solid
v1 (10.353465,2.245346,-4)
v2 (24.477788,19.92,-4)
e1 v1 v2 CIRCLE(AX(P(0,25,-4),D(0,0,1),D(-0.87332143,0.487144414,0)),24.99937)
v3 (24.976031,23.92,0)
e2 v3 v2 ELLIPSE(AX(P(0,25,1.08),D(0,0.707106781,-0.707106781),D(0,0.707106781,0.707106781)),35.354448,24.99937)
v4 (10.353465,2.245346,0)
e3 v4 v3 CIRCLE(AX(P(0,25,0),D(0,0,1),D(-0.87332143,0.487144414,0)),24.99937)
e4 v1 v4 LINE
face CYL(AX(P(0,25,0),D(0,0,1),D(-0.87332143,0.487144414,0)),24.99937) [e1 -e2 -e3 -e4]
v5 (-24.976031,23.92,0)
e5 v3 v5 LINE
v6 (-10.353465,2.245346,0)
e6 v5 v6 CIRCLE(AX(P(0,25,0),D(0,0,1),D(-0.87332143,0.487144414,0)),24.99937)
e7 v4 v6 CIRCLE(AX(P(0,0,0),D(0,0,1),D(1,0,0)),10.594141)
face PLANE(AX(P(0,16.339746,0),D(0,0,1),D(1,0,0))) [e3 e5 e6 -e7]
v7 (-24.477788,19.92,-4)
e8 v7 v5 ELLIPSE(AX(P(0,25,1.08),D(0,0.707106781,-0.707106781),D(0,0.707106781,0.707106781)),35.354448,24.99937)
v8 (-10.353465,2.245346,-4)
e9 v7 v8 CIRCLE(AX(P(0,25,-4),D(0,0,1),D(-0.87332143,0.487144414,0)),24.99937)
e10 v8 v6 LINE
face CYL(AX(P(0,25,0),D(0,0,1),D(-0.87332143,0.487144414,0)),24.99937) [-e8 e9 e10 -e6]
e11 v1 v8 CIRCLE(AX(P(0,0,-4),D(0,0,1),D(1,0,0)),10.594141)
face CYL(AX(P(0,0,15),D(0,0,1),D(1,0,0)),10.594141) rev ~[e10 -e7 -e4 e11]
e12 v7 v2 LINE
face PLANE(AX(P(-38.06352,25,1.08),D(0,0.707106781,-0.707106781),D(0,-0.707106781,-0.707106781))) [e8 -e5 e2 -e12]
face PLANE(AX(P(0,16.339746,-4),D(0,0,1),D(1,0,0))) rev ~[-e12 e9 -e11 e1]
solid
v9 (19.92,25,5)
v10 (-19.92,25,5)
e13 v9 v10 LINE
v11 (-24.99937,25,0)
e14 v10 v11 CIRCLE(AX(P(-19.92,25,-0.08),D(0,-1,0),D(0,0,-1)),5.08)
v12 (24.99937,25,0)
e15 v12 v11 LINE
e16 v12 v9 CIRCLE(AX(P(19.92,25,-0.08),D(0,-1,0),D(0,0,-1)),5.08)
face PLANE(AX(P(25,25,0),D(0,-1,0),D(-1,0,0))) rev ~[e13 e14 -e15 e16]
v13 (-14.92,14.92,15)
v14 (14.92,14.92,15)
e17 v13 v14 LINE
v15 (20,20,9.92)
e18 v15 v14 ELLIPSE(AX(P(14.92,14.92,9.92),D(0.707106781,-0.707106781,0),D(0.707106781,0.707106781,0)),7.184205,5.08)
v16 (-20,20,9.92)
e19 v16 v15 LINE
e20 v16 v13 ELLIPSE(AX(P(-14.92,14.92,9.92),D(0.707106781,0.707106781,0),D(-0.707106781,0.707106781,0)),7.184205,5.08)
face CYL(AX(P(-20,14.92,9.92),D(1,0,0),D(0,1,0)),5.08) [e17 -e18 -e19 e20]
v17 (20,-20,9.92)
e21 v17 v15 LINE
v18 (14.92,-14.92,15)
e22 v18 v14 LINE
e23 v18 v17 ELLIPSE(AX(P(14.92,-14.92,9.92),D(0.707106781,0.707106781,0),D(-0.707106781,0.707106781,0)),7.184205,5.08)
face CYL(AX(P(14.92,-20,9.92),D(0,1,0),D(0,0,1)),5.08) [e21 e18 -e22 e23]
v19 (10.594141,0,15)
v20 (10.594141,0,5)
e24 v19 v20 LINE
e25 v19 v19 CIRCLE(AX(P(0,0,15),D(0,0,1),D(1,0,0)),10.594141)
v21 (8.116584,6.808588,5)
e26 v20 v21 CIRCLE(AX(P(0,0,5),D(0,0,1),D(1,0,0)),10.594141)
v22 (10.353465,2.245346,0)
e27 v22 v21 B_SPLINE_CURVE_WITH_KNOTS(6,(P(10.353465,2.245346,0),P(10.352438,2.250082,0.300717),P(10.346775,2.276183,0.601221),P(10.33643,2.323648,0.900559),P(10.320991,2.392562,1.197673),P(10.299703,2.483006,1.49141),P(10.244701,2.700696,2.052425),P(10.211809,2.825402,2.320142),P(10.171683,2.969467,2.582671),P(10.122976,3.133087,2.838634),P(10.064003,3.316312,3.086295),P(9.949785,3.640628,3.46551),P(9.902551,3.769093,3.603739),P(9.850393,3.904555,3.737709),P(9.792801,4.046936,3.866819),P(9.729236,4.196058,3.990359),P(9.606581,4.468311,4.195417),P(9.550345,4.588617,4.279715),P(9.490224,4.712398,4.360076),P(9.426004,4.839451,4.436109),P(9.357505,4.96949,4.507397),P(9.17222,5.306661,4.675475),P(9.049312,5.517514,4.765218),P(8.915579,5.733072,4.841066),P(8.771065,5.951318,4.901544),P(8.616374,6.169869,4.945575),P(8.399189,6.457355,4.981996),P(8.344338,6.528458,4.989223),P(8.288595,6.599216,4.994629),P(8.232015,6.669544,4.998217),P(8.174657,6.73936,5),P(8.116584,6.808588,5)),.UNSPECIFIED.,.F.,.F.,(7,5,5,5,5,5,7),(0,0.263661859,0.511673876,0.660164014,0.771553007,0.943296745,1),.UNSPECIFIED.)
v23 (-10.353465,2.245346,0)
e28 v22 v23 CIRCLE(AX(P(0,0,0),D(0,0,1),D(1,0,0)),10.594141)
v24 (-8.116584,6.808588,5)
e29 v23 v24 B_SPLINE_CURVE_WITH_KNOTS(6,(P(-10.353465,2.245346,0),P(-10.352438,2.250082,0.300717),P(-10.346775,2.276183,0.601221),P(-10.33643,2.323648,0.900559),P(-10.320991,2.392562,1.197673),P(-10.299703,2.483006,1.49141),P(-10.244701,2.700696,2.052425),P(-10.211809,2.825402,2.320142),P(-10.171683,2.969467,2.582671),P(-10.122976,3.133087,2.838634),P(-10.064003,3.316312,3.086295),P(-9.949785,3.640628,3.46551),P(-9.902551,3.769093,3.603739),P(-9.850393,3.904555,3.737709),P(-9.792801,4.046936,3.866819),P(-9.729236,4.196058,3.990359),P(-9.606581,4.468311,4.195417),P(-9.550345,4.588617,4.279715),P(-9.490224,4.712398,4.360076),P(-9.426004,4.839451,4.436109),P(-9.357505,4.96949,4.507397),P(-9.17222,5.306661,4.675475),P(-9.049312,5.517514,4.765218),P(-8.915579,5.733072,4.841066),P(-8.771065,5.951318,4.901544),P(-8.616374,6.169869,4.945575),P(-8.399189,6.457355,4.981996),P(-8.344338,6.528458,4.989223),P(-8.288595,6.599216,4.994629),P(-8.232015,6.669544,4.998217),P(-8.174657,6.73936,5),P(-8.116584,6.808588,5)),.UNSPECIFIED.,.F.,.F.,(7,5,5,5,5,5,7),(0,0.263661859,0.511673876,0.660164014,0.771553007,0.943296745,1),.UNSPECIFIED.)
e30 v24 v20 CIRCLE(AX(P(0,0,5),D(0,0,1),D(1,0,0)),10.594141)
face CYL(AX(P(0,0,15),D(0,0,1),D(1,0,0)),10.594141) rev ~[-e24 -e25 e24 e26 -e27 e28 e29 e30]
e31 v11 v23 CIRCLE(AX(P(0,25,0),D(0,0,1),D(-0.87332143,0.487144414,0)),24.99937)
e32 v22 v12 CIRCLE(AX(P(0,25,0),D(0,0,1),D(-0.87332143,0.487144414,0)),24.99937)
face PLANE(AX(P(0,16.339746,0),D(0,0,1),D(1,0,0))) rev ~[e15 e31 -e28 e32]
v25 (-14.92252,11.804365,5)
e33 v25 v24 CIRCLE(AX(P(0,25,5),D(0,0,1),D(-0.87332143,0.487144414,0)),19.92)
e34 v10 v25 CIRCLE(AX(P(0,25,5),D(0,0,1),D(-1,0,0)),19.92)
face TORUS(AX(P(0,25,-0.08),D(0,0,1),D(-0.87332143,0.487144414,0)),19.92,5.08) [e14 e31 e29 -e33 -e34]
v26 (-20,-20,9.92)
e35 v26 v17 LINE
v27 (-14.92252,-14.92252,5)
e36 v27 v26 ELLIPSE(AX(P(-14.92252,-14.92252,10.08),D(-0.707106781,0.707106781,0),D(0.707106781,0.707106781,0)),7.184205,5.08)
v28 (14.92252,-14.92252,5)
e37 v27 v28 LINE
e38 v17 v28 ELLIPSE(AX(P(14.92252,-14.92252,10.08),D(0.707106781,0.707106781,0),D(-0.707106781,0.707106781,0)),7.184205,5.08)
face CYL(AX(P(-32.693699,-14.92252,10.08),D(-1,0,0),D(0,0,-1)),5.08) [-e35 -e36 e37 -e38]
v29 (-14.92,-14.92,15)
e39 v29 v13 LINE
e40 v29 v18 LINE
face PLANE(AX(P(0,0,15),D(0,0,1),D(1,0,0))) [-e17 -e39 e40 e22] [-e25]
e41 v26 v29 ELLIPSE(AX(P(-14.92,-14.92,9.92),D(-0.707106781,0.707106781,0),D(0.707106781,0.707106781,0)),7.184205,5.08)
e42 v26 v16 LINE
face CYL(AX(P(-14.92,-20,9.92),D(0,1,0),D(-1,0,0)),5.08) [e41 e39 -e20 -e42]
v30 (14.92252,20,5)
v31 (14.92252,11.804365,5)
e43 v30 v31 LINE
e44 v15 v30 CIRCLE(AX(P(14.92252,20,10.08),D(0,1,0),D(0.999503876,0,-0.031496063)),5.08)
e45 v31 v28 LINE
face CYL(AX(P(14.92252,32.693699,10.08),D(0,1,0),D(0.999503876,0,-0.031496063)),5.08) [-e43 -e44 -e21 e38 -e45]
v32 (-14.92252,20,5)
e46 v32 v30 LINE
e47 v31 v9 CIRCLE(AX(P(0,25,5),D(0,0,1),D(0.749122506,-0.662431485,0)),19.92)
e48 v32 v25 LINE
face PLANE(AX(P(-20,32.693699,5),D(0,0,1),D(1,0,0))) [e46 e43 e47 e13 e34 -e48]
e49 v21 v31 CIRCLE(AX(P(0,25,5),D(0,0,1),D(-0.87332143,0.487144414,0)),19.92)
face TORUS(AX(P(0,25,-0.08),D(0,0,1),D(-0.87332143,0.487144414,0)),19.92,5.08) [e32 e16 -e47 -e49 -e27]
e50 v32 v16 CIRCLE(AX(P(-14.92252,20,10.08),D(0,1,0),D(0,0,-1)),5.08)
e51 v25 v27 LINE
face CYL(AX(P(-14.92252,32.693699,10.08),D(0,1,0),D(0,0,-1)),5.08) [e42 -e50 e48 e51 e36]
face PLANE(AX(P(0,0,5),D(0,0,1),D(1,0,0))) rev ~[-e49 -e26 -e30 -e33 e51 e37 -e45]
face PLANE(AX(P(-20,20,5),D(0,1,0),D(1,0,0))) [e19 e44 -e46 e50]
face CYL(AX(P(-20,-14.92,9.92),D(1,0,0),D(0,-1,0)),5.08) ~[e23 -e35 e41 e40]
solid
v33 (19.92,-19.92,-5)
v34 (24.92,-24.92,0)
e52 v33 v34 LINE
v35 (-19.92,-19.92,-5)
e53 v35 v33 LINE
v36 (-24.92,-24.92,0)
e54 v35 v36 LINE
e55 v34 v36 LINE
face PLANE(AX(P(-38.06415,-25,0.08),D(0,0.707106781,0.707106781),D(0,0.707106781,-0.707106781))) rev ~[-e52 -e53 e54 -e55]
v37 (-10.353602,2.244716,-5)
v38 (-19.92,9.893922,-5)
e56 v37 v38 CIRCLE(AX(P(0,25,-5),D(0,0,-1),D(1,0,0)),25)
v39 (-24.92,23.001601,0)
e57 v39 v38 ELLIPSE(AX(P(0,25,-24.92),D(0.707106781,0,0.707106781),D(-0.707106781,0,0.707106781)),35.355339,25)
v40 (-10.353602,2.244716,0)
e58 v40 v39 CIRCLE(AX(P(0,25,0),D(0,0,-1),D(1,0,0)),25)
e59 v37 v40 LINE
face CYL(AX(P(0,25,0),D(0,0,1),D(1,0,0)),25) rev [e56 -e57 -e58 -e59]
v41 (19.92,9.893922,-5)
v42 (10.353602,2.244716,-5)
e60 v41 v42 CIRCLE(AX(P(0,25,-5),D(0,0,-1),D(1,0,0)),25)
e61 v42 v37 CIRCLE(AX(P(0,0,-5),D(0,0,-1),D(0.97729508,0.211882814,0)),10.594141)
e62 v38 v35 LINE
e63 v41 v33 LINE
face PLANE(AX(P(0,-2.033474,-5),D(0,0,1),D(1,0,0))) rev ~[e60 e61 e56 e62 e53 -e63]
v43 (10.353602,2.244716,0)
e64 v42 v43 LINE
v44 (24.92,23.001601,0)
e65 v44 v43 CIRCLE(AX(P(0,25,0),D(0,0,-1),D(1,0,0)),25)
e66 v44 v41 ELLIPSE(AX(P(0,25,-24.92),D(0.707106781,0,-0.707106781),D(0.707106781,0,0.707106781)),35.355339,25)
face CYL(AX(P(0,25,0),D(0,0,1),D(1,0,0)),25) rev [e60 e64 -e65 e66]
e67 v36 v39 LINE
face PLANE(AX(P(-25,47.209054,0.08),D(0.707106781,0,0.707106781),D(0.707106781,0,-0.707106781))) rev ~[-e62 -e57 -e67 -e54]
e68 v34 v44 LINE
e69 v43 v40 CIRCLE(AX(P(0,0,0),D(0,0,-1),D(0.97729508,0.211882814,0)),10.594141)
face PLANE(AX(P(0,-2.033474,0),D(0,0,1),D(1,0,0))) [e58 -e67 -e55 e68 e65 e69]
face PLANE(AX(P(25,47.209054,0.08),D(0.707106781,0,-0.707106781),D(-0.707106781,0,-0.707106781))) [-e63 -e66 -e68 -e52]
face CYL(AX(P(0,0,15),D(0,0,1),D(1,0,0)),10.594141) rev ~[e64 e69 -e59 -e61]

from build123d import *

# Parameters (mm, degrees)
F1_DEPTH      = 5
F2_DEPTH      = 5
F3_T2_ANGLE   = 238.3061287116
F4_DEPTH      = 4
F5_T1_DEPTH   = 85.2732038629
F5_T3_DEPTH   = 76.1282991577
F5_2_T1_DEPTH = 76.1270392372
F7_W          = 40
F7_H          = 40
F8_DEPTH      = 10
F9_R          = 5.08
F10_T1_DEPTH  = 65.3873984488
F10_T3_DEPTH  = 65.3873984488
F12_R         = 10.5941406936
F13_DEPTH     = 76.2


# Not quite as in the source:
# - a fillet or chamfer that OpenCascade refuses, or shapes differently, is made with other operations: its cross-section is extruded or revolved along the edge and cut away or added


with BuildPart() as f1:
    # F0 (on Top) → F1 (new body)
    with BuildSketch(Plane.XY):
        with BuildLine():
            Line((-25, -25), (25, -25))
            Line((25, -25), (25, 25))
            ThreePointArc((25, 25), (0, 0), (-25, 25))
            Line((-25, 25), (-25, -25))
        make_face()
    extrude(amount=-F1_DEPTH)

    # F5: chamfer of 5.08 on 3 edges, made by hand

    # F5_s2 → F5_t1 (cut)
    with BuildSketch(Plane.XZ.offset(-47.2090542841)):
        Polygon((-25, 0.08), (-19.92, -5), (-25, -5), align=None)
        Polygon((25, 0.08), (19.92, -5), (25, -5), align=None)
    extrude(amount=F5_T1_DEPTH, mode=Mode.SUBTRACT)

    # F5_s4 → F5_t3 (cut)
    with BuildSketch(Plane.YZ.offset(-38.0641495789)):
        Polygon((-25, 0.08), (-19.92, -5), (-25, -5), align=None)
    extrude(amount=F5_T3_DEPTH, mode=Mode.SUBTRACT)


with BuildPart() as f2:
    # F0 (on Top) → F2 (new body)
    with BuildSketch(Plane.XY):
        with BuildLine():
            ThreePointArc((-25, 25), (0, 0), (25, 25))
            Line((25, 25), (-25, 25))
        make_face()
    extrude(amount=F2_DEPTH)

    # F3: fillet of radius 5.08 on 1 edges, made by hand

    # F3_s1 → F3_t2 (revolve, cut)
    with BuildSketch(Plane(origin=(10.6358414033, 19.0672580005, 0), x_dir=(0, 0, 1), z_dir=(0.4871444139, 0.87332143, 0))):
        with BuildLine():
            ThreePointArc((-0.08, -37.1786103472), (3.5121024484, -35.6907127956), (5, -32.0986103472))
            Line((5, -32.0986103472), (5, -37.1786103472))
            Line((5, -37.1786103472), (-0.08, -37.1786103472))
        make_face()
    revolve(axis=Axis((0, 25, 5), (0, 0, 1)), revolution_arc=F3_T2_ANGLE, mode=Mode.SUBTRACT)


with BuildPart() as f4:
    # F4 (new): a face of the model
    f4_faces = [f2.part.faces().sort_by_distance(p)[0] for p in [
        (0, 14.389937824, 0),
    ]]
    extrude(f4_faces, amount=F4_DEPTH)

    # F5#2: chamfer of 5.08 on 1 edges, made by hand

    # F5_2_s2 → F5_2_t1 (cut)
    with BuildSketch(Plane.YZ.offset(-38.0635196186)):
        Polygon((25, 1.08), (19.92, -4), (25, -4), align=None)
    extrude(amount=F5_2_T1_DEPTH, mode=Mode.SUBTRACT)


with BuildPart() as f2_1:
    add(f2.part)

    # F7 (on offset) → F8 (join)
    with BuildSketch(Plane.XY.offset(5)):
        Rectangle(F7_W, F7_H)
    extrude(amount=F8_DEPTH)

    # F9
    f9_edges = [f2_1.edges().sort_by_distance(p)[0] for p in [
        (-20, 0, 15),
        (0, 20, 15),
        (20, 0, 15),
        (0, -20, 15),
    ]]
    fillet(f9_edges, radius=F9_R)

    # F10: fillet of radius 5.08 on 3 edges, made by hand

    # F10_s2 → F10_t1 (cut)
    with BuildSketch(Plane.XZ.offset(-32.6936992244)):
        with BuildLine():
            ThreePointArc((20, 9.92), (18.4576016389, 6.4317675513), (14.9225203102, 5))
            Line((14.9225203102, 5), (20, 5))
            Line((20, 5), (20, 9.92))
        make_face()
        with BuildLine():
            ThreePointArc((-14.9225203102, 5), (-18.4576016389, 6.4317675513), (-20, 9.92))
            Line((-20, 9.92), (-20, 5))
            Line((-20, 5), (-14.9225203102, 5))
        make_face()
    extrude(amount=F10_T1_DEPTH, mode=Mode.SUBTRACT)

    # F10_s4 → F10_t3 (cut)
    with BuildSketch(Plane.YZ.offset(-32.6936992244)):
        with BuildLine():
            ThreePointArc((-14.9225203102, 5), (-18.4576016389, 6.4317675513), (-20, 9.92))
            Line((-20, 9.92), (-20, 5))
            Line((-20, 5), (-14.9225203102, 5))
        make_face()
    extrude(amount=F10_T3_DEPTH, mode=Mode.SUBTRACT)


with BuildPart() as f13_tool:
    # F12 (on offset) → F13 (new body)
    with BuildSketch(Plane.XY.offset(15)):
        Circle(F12_R)
    extrude(amount=-F13_DEPTH)


with BuildPart() as f1_1:
    add(f1.part)

    # F13: cut by f13_tool
    add(f13_tool.part, mode=Mode.SUBTRACT)


with BuildPart() as f2_2:
    add(f2_1.part)

    # F13: cut by f13_tool
    add(f13_tool.part, mode=Mode.SUBTRACT)


with BuildPart() as f4_1:
    add(f4.part)

    # F13: cut by f13_tool
    add(f13_tool.part, mode=Mode.SUBTRACT)


solid = Compound([f1_1.part, f2_2.part, f4_1.part])
